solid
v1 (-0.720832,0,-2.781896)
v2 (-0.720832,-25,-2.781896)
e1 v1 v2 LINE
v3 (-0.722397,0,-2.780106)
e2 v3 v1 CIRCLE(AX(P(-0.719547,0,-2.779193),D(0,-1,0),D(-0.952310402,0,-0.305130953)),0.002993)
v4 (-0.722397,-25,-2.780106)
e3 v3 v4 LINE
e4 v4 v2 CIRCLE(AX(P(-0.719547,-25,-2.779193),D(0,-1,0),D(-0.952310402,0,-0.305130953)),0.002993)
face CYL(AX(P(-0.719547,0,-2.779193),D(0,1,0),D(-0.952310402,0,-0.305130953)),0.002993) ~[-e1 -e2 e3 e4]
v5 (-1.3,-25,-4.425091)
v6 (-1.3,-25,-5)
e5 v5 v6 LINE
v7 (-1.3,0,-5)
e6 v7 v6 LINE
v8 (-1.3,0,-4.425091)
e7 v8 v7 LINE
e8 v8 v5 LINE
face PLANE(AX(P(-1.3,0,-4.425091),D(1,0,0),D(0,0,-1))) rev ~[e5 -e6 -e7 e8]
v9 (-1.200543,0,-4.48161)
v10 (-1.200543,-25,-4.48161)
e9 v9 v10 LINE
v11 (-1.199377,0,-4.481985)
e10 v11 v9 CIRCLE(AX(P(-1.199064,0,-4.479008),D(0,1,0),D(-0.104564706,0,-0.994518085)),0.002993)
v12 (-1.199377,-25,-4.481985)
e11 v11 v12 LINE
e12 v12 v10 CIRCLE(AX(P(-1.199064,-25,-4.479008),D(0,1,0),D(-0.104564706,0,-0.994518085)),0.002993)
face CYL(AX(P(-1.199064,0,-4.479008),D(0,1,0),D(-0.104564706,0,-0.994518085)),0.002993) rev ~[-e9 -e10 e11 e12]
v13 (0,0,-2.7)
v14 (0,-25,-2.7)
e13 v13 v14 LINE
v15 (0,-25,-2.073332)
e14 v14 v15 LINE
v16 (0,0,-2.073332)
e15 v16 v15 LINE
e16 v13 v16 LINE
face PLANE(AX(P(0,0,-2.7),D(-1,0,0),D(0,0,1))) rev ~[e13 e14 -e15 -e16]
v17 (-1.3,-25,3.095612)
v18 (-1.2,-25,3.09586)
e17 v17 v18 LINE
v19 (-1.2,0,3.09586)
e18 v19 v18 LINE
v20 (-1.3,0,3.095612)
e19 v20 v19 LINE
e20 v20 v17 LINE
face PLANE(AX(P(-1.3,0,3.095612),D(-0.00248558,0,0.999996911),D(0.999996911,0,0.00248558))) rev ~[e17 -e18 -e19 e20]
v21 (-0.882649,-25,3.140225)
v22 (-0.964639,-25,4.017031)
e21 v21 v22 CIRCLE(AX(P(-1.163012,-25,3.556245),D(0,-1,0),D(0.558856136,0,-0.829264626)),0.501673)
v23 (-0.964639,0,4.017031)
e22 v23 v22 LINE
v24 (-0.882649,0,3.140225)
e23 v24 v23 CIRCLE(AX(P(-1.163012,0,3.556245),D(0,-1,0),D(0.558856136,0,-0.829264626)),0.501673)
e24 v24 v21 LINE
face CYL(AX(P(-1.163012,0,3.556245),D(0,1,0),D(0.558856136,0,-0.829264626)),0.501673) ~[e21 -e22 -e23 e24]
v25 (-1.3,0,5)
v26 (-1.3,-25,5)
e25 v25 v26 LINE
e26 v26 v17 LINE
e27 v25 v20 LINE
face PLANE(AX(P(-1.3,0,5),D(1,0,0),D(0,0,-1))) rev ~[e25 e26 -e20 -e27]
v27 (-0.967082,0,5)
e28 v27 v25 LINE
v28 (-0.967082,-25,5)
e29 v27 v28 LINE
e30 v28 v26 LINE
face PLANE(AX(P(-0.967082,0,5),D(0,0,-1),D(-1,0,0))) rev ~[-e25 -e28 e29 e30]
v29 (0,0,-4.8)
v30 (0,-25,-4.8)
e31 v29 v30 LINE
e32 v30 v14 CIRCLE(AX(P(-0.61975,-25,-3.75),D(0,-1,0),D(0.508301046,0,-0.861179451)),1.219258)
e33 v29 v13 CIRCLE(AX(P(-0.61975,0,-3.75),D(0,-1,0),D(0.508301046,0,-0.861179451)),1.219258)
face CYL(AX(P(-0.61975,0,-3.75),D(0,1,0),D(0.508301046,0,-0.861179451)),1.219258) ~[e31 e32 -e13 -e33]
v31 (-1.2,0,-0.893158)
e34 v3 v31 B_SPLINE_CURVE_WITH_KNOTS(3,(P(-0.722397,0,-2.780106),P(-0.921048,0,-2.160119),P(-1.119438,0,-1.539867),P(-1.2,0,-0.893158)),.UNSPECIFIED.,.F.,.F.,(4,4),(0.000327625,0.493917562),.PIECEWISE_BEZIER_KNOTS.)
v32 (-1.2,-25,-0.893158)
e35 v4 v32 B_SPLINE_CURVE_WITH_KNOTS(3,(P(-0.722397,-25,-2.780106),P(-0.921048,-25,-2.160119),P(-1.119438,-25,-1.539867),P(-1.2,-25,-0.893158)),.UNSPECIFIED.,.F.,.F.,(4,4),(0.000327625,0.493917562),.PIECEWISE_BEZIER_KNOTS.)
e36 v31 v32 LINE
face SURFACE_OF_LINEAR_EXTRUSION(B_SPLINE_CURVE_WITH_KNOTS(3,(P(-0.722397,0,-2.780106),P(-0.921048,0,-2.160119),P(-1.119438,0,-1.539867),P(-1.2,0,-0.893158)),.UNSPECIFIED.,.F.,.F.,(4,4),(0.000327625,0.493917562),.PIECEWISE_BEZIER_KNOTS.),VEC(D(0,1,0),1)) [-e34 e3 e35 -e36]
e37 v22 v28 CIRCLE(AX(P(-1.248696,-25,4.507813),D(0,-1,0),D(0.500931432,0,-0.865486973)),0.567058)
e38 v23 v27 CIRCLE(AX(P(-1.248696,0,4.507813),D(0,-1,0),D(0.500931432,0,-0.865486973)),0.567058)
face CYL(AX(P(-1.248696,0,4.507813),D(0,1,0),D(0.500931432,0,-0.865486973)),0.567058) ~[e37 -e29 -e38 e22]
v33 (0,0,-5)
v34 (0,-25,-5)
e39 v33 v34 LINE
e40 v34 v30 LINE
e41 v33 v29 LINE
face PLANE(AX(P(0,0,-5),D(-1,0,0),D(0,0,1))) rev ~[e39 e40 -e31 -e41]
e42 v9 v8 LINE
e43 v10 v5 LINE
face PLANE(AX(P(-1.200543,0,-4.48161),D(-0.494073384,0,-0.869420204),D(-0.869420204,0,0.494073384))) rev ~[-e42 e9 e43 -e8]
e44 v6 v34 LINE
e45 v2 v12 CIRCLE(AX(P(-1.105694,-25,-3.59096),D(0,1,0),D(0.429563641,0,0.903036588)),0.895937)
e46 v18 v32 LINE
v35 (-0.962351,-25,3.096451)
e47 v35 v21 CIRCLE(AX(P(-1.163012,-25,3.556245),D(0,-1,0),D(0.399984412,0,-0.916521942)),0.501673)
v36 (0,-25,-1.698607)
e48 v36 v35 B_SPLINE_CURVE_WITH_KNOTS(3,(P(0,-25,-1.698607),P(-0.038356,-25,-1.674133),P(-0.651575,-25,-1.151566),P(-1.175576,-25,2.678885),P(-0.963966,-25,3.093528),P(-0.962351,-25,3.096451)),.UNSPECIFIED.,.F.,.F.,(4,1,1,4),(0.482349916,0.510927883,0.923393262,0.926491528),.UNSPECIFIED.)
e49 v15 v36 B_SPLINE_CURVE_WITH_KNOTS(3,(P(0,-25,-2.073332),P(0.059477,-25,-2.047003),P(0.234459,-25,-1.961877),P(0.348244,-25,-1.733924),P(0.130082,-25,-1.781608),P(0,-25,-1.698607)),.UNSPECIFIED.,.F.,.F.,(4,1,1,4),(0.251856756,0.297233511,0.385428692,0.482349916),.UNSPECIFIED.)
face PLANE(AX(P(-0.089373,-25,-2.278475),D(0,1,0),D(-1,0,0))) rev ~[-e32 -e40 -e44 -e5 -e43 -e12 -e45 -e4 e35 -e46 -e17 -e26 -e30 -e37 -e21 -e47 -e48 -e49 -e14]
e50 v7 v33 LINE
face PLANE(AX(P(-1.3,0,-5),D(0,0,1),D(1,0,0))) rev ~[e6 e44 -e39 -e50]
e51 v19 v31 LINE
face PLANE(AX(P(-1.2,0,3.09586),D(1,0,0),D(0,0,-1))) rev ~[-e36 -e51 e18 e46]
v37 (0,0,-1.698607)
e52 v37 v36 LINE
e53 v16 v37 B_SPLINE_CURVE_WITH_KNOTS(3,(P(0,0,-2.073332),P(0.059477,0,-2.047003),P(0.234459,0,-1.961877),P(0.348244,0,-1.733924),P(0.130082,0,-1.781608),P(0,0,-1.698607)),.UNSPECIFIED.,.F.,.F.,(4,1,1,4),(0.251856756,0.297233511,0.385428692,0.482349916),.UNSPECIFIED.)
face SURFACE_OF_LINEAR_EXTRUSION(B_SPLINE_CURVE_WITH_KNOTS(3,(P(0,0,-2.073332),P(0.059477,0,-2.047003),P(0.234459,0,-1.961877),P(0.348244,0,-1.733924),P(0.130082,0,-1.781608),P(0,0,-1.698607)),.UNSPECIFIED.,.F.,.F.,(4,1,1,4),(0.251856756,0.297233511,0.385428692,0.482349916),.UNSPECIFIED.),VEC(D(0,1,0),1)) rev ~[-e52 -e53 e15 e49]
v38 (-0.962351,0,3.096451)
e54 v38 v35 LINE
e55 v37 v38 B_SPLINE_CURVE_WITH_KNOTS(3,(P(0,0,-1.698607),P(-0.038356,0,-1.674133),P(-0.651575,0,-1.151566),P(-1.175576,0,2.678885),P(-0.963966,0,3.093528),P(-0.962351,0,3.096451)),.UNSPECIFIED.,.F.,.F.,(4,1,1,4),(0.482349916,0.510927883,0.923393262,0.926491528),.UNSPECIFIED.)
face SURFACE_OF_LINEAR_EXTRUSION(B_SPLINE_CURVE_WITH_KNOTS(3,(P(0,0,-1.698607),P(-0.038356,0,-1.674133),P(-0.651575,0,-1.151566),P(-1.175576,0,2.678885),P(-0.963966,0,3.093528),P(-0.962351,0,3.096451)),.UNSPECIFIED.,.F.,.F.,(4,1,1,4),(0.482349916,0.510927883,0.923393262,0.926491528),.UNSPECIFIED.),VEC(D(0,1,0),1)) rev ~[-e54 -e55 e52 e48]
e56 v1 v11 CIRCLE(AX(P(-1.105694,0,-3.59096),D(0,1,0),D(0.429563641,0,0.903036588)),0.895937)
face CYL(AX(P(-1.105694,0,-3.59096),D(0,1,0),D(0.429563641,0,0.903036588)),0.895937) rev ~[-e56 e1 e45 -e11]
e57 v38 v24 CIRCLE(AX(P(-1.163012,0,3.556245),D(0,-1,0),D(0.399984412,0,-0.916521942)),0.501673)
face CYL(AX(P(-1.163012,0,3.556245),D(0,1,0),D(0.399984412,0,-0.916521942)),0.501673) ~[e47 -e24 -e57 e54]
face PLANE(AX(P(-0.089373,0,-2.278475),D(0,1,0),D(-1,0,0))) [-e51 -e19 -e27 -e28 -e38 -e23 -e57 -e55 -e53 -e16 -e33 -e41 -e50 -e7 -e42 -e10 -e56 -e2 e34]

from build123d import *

# Parameters (mm, degrees)
F1_DEPTH = 25


with BuildPart() as f1:
    # F0 (on Front) → F1 (new body)
    with BuildSketch(Plane.XZ):
        with BuildLine():
            add(Edge.make_bspline(
                [(0, -2.5), (-0.0708144549, -2.4524918378), (-0.1956100643, -2.3687686762), (-0.3180885676, -2.1971845687), (-0.1116996866, -2.1227784123), (0, -2.0733320448)],
                knots=[0, 0, 0, 0, 0.0945574941, 0.1666377313, 0.2518567558, 0.2518567558, 0.2518567558, 0.2518567558], degree=3))
            Line((0, -2.5), (0, -2.0733320448))
        make_face()
        with BuildLine():
            Line((0, -2.7), (0, -2.5))
            add(Edge.make_bspline(
                [(0, -2.5), (-0.0708144549, -2.4524918378), (-0.1956100643, -2.3687686762), (-0.3180885676, -2.1971845687), (-0.1116996866, -2.1227784123), (0, -2.0733320448)],
                knots=[0, 0, 0, 0, 0.0945574941, 0.1666377313, 0.2518567558, 0.2518567558, 0.2518567558, 0.2518567558], degree=3))
            Line((0, -2.0733320448), (0, -1.6986069948))
            add(Edge.make_bspline(
                [(0, -1.6986069948), (-0.0383555824, -1.6741333918), (-0.6515753448, -1.1515664964), (-1.1755755053, 2.6788852088), (-0.9639657726, 3.0935284682), (-0.9623506631, 3.0964508274)],
                knots=[0.482349916, 0.482349916, 0.482349916, 0.482349916, 0.5109278826, 0.9233932624, 0.9264915283, 0.9264915283, 0.9264915283, 0.9264915283], degree=3))
            add(Edge.make_bspline(
                [(-0.9623506631, 3.0964508274), (-0.9410767081, 3.1349436593), (-0.9133074942, 3.1441076976), (-0.8826490073, 3.1402254678)],
                knots=[0.9264915283, 0.9264915283, 0.9264915283, 0.9264915283, 0.9673013749, 0.9673013749, 0.9673013749, 0.9673013749], degree=3))
            ThreePointArc((-0.8826490073, 3.1402254678), (-0.6635180881, 3.6029526705), (-0.9646388468, 4.0170313014))
            ThreePointArc((-0.9646388468, 4.0170313014), (-0.6816397602, 4.5092221063), (-0.9670821019, 5))
            Line((-0.9670821019, 5), (-1.3, 5))
            Line((-1.3, 5), (-1.3, 3.0956115703))
            Line((-1.3, 3.0956115703), (-1.2, 3.0958601291))
            Line((-1.2, 3.0958601291), (-1.2, 1.1517136591))
            Line((-1.2, 1.1517136591), (-1.2, -0.8931580232))
            add(Edge.make_bspline(
                [(-0.7223970163, -2.7801062833), (-0.921047879, -2.1601191709), (-1.119437918, -1.5398665045), (-1.2, -0.8931580232)],
                knots=[0.0003276246, 0.0003276246, 0.0003276246, 0.0003276246, 0.4939175623, 0.4939175623, 0.4939175623, 0.4939175623], degree=3))
            ThreePointArc((-0.7223970163, -2.7801062833), (-0.7217999511, -2.781163117), (-0.7208323102, -2.7818959578))
            ThreePointArc((-0.7208323102, -2.7818959578), (-0.2432721108, -3.8337162096), (-1.1993774544, -4.4819847944))
            ThreePointArc((-1.1993774544, -4.4819847944), (-1.199979754, -4.481857829), (-1.2005433473, -4.4816103465))
            Line((-1.2005433473, -4.4816103465), (-1.3, -4.4250912033))
            Line((-1.3, -4.4250912033), (-1.3, -5))
            Line((-1.3, -5), (0, -5))
            Line((0, -5), (0, -4.8))
            ThreePointArc((0, -4.8), (0.5995079207, -3.75), (0, -2.7))
        make_face()
        with BuildLine():
            Line((0, -1.6986069948), (0, -2.0733320448))
            add(Edge.make_bspline(
                [(0, -2.0733320448), (0.0594769695, -2.0470032325), (0.2344591808, -1.9618765045), (0.3482438258, -1.7339244568), (0.1300816825, -1.7816084057), (0, -1.6986069948)],
                knots=[0.2518567558, 0.2518567558, 0.2518567558, 0.2518567558, 0.2972335109, 0.3854286924, 0.482349916, 0.482349916, 0.482349916, 0.482349916], degree=3))
        make_face()
        with BuildLine():
            add(Edge.make_bspline(
                [(-0.9623506631, 3.0964508274), (-0.9410767081, 3.1349436593), (-0.9133074942, 3.1441076976), (-0.8826490073, 3.1402254678)],
                knots=[0.9264915283, 0.9264915283, 0.9264915283, 0.9264915283, 0.9673013749, 0.9673013749, 0.9673013749, 0.9673013749], degree=3))
            ThreePointArc((-0.9623506631, 3.0964508274), (-0.9215059833, 3.1165286149), (-0.8826490073, 3.1402254678))
        make_face()
    extrude(amount=F1_DEPTH)


solid = f1.part
